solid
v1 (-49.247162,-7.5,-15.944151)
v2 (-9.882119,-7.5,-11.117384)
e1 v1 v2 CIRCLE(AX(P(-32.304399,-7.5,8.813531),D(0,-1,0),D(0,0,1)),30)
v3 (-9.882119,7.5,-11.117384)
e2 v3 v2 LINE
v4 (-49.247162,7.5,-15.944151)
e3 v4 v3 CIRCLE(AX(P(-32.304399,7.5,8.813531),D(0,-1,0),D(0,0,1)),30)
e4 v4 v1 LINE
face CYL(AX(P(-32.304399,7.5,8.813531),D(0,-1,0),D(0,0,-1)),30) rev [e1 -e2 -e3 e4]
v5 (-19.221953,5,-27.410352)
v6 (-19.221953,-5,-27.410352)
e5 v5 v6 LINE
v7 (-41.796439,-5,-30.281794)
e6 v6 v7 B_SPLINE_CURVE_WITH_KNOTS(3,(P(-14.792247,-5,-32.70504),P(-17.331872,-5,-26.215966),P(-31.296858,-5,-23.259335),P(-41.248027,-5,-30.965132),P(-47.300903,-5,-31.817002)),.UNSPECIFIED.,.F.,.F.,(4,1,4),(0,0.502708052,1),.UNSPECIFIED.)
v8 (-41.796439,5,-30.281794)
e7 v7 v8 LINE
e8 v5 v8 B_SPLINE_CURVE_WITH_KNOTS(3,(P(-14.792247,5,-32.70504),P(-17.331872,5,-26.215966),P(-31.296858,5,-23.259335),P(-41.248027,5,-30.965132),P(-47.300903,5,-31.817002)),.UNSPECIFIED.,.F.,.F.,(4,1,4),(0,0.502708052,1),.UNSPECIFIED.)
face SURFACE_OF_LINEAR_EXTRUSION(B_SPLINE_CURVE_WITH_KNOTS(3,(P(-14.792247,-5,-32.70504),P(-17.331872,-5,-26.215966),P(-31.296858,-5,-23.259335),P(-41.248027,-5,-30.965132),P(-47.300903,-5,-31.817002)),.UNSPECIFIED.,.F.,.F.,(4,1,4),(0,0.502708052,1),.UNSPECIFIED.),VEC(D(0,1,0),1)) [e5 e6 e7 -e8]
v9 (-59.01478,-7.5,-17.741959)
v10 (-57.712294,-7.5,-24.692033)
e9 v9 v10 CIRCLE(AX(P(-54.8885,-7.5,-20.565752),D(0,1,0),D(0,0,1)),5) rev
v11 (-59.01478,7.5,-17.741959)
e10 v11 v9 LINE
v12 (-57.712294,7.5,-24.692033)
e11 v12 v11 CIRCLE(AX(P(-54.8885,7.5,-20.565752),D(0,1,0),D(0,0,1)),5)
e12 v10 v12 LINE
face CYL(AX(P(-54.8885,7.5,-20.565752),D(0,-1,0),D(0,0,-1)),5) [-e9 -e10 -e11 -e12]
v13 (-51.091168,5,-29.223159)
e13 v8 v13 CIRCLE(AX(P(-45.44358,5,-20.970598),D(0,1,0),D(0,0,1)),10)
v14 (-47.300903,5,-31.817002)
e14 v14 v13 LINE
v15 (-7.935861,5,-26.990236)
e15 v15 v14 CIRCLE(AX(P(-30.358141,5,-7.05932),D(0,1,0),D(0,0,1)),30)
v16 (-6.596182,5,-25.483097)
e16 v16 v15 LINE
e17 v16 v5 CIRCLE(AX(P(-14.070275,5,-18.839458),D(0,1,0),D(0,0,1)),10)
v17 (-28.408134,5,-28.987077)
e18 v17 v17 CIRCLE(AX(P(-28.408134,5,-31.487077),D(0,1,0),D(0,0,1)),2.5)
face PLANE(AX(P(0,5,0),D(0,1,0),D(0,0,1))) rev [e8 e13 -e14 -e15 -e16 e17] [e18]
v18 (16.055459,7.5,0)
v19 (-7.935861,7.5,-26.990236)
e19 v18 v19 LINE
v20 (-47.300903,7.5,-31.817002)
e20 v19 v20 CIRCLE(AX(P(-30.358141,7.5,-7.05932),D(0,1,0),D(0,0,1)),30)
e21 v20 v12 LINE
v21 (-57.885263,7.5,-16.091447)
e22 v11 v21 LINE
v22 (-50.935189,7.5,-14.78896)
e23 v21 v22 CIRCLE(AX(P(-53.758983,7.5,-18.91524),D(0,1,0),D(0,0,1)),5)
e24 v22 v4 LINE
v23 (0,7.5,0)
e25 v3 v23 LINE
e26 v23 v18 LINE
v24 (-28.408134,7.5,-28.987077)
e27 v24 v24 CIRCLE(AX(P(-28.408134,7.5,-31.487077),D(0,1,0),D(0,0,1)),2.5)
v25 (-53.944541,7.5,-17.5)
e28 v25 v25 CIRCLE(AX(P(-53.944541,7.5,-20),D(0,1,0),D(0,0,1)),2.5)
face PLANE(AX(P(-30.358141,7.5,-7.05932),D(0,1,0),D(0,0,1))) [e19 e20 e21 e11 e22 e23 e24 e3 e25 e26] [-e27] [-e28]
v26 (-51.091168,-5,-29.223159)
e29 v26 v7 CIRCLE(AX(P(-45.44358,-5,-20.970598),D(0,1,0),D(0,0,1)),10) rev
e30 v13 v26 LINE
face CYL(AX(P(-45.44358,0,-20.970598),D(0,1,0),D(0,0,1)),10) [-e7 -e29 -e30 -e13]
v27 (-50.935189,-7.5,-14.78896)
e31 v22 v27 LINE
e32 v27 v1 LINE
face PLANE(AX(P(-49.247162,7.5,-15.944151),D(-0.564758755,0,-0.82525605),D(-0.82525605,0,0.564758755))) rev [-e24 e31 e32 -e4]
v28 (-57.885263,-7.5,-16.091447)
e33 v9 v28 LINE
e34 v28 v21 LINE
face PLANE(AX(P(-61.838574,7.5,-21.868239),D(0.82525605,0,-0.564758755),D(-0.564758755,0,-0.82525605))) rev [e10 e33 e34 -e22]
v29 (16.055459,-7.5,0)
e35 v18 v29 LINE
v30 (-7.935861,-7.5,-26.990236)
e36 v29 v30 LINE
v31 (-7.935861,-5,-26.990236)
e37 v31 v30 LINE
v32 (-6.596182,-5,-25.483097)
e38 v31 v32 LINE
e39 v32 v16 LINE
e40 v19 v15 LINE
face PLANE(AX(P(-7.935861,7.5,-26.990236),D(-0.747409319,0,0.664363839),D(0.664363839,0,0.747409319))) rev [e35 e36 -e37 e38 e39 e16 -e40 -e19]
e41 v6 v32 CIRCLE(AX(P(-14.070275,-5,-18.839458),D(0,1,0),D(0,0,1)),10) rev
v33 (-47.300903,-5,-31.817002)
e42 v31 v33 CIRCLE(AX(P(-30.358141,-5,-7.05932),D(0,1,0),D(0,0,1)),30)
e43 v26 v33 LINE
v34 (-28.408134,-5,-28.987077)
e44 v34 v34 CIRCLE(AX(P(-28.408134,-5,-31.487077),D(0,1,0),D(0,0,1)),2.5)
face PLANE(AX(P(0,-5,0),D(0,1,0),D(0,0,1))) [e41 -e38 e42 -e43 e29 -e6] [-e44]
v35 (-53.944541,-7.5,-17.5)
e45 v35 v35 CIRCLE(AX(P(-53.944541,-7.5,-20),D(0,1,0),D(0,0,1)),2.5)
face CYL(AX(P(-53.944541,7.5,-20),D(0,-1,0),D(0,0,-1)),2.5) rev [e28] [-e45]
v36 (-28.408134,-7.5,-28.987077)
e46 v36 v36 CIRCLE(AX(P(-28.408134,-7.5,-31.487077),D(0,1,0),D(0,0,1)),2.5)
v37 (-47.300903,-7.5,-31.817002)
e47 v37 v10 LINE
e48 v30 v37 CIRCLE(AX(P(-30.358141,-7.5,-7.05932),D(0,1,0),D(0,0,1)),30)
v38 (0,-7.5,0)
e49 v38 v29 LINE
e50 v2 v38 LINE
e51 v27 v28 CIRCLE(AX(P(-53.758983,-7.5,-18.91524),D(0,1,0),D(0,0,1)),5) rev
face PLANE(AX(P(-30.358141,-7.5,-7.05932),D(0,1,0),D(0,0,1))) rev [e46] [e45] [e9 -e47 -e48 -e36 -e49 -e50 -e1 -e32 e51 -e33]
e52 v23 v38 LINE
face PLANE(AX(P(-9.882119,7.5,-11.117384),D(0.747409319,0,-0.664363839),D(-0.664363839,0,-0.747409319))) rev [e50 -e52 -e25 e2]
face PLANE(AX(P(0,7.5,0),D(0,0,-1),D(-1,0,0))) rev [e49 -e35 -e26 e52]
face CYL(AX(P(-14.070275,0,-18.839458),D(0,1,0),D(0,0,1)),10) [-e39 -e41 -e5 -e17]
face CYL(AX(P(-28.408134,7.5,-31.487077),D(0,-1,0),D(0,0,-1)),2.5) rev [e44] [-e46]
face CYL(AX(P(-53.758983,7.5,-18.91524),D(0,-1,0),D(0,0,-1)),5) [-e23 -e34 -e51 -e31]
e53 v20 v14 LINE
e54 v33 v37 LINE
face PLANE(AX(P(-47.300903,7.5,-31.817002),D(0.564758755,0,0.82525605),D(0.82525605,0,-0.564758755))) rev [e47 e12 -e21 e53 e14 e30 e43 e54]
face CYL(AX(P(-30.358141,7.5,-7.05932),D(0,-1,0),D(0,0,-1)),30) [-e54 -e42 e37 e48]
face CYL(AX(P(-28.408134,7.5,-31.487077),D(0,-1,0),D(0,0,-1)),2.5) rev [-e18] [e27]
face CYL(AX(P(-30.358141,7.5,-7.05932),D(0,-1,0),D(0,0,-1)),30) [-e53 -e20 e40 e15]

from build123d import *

# Parameters (mm, degrees)
SKETCH3_R           = 2.5
BOSS_EXTRUDE2_DEPTH = 7.5
CUT_EXTRUDE2_DEPTH  = 5
FILLET1_START       = -5
FILLET1_DEPTH       = 10
FILLET2_R           = 5


with BuildPart() as part:
    # Sketch3 → Boss-Extrude2 (new, symmetric)
    with BuildSketch(Plane(origin=(0, 0, 0), x_dir=(1, 0, 0), z_dir=(0, 1, 0))):
        with BuildLine():
            Line((0, 0), (16.055459438, 0))
            Line((16.055459438, 0), (-7.935861068, 26.99023557))
            ThreePointArc((-7.935861068, 26.99023557), (-26.707018244, 36.836313291), (-47.300903293, 31.817001905))
            Line((-47.300903293, 31.817001905), (-61.838574124, 21.868238869))
            Line((-61.838574124, 21.868238869), (-55.061469058, 11.965166269))
            Line((-55.061469058, 11.965166269), (-49.247161684, 15.944150727))
            ThreePointArc((-49.247161684, 15.944150727), (-28.653276634, 20.963462112), (-9.882119459, 11.117384391))
            Line((-9.882119459, 11.117384391), (0, 0))
        make_face()
        with Locations(Location((-53.944540562, 20, 0), (0, 0, 270))):
            Circle(SKETCH3_R, mode=Mode.SUBTRACT)
        with Locations(Location((-28.408134096, 31.487077096, 0), (0, 0, 270))):
            Circle(SKETCH3_R, mode=Mode.SUBTRACT)
    extrude(amount=BOSS_EXTRUDE2_DEPTH, both=True)

    # Sketch6 → Cut-Extrude2 (cut, symmetric)
    with BuildSketch(Plane(origin=(0, 0, 0), x_dir=(1, 0, 0), z_dir=(0, 1, 0))):
        with BuildLine():
            add(Edge.make_bspline(
                [(-14.79224673, 32.705040265), (-17.331871812, 26.215966366), (-31.296858097, 23.259335294), (-41.248027481, 30.965132279), (-47.300903293, 31.817001905)],
                knots=[0, 0, 0, 0, 0.502708052, 1, 1, 1, 1], degree=3))
            ThreePointArc((-14.79224673, 32.705040265), (-31.177344469, 37.048133404), (-47.300903293, 31.817001905))
        make_face()
    extrude(amount=CUT_EXTRUDE2_DEPTH, both=True, mode=Mode.SUBTRACT)

    # Fillet1: read off the stored shape, not the designer's step
    # Fillet1 outline → Fillet1 (cut)
    with BuildSketch(Plane(origin=(0, 0, 0), x_dir=(1, 0, 0), z_dir=(0, 1, 0)).offset(FILLET1_START)):
        with BuildLine():
            ThreePointArc((-19.221952817, 27.410351809), (-12.561308079, 28.72495355), (-6.596181971, 25.483096586))
            Line((-6.596181971, 25.483096586), (-7.935861068, 26.99023557))
            ThreePointArc((-7.935861068, 26.99023557), (-11.150327664, 30.10405779), (-14.79224673, 32.705040265))
            add(Edge.make_bspline(
                [(-14.79224673, 32.705040265), (-15.739998483, 30.283410709), (-17.311764452, 28.558502186), (-19.221952817, 27.410351809)],
                knots=[0, 0, 0, 0, 0.187603454, 0.187603454, 0.187603454, 0.187603454], degree=3))
        make_face()
        with BuildLine():
            ThreePointArc((-51.091167548, 29.223158548), (-46.575226496, 30.906360534), (-41.796439127, 30.281793648))
            add(Edge.make_bspline(
                [(-41.796439127, 30.281793648), (-43.564588599, 30.974367456), (-45.376964166, 31.546230564), (-47.300903293, 31.817001905)],
                knots=[0.84193308, 0.84193308, 0.84193308, 0.84193308, 1, 1, 1, 1], degree=3))
            Line((-47.300903293, 31.817001905), (-51.091167548, 29.223158548))
        make_face()
    extrude(amount=FILLET1_DEPTH, mode=Mode.SUBTRACT)

    # Fillet2
    fillet2_edges = [part.edges().sort_by_distance(p)[0] for p in [
        (-55.061469058, 0, -11.965166269),
        (-61.838574124, 0, -21.868238869),
    ]]
    fillet(fillet2_edges, radius=FILLET2_R)


solid = part.part
